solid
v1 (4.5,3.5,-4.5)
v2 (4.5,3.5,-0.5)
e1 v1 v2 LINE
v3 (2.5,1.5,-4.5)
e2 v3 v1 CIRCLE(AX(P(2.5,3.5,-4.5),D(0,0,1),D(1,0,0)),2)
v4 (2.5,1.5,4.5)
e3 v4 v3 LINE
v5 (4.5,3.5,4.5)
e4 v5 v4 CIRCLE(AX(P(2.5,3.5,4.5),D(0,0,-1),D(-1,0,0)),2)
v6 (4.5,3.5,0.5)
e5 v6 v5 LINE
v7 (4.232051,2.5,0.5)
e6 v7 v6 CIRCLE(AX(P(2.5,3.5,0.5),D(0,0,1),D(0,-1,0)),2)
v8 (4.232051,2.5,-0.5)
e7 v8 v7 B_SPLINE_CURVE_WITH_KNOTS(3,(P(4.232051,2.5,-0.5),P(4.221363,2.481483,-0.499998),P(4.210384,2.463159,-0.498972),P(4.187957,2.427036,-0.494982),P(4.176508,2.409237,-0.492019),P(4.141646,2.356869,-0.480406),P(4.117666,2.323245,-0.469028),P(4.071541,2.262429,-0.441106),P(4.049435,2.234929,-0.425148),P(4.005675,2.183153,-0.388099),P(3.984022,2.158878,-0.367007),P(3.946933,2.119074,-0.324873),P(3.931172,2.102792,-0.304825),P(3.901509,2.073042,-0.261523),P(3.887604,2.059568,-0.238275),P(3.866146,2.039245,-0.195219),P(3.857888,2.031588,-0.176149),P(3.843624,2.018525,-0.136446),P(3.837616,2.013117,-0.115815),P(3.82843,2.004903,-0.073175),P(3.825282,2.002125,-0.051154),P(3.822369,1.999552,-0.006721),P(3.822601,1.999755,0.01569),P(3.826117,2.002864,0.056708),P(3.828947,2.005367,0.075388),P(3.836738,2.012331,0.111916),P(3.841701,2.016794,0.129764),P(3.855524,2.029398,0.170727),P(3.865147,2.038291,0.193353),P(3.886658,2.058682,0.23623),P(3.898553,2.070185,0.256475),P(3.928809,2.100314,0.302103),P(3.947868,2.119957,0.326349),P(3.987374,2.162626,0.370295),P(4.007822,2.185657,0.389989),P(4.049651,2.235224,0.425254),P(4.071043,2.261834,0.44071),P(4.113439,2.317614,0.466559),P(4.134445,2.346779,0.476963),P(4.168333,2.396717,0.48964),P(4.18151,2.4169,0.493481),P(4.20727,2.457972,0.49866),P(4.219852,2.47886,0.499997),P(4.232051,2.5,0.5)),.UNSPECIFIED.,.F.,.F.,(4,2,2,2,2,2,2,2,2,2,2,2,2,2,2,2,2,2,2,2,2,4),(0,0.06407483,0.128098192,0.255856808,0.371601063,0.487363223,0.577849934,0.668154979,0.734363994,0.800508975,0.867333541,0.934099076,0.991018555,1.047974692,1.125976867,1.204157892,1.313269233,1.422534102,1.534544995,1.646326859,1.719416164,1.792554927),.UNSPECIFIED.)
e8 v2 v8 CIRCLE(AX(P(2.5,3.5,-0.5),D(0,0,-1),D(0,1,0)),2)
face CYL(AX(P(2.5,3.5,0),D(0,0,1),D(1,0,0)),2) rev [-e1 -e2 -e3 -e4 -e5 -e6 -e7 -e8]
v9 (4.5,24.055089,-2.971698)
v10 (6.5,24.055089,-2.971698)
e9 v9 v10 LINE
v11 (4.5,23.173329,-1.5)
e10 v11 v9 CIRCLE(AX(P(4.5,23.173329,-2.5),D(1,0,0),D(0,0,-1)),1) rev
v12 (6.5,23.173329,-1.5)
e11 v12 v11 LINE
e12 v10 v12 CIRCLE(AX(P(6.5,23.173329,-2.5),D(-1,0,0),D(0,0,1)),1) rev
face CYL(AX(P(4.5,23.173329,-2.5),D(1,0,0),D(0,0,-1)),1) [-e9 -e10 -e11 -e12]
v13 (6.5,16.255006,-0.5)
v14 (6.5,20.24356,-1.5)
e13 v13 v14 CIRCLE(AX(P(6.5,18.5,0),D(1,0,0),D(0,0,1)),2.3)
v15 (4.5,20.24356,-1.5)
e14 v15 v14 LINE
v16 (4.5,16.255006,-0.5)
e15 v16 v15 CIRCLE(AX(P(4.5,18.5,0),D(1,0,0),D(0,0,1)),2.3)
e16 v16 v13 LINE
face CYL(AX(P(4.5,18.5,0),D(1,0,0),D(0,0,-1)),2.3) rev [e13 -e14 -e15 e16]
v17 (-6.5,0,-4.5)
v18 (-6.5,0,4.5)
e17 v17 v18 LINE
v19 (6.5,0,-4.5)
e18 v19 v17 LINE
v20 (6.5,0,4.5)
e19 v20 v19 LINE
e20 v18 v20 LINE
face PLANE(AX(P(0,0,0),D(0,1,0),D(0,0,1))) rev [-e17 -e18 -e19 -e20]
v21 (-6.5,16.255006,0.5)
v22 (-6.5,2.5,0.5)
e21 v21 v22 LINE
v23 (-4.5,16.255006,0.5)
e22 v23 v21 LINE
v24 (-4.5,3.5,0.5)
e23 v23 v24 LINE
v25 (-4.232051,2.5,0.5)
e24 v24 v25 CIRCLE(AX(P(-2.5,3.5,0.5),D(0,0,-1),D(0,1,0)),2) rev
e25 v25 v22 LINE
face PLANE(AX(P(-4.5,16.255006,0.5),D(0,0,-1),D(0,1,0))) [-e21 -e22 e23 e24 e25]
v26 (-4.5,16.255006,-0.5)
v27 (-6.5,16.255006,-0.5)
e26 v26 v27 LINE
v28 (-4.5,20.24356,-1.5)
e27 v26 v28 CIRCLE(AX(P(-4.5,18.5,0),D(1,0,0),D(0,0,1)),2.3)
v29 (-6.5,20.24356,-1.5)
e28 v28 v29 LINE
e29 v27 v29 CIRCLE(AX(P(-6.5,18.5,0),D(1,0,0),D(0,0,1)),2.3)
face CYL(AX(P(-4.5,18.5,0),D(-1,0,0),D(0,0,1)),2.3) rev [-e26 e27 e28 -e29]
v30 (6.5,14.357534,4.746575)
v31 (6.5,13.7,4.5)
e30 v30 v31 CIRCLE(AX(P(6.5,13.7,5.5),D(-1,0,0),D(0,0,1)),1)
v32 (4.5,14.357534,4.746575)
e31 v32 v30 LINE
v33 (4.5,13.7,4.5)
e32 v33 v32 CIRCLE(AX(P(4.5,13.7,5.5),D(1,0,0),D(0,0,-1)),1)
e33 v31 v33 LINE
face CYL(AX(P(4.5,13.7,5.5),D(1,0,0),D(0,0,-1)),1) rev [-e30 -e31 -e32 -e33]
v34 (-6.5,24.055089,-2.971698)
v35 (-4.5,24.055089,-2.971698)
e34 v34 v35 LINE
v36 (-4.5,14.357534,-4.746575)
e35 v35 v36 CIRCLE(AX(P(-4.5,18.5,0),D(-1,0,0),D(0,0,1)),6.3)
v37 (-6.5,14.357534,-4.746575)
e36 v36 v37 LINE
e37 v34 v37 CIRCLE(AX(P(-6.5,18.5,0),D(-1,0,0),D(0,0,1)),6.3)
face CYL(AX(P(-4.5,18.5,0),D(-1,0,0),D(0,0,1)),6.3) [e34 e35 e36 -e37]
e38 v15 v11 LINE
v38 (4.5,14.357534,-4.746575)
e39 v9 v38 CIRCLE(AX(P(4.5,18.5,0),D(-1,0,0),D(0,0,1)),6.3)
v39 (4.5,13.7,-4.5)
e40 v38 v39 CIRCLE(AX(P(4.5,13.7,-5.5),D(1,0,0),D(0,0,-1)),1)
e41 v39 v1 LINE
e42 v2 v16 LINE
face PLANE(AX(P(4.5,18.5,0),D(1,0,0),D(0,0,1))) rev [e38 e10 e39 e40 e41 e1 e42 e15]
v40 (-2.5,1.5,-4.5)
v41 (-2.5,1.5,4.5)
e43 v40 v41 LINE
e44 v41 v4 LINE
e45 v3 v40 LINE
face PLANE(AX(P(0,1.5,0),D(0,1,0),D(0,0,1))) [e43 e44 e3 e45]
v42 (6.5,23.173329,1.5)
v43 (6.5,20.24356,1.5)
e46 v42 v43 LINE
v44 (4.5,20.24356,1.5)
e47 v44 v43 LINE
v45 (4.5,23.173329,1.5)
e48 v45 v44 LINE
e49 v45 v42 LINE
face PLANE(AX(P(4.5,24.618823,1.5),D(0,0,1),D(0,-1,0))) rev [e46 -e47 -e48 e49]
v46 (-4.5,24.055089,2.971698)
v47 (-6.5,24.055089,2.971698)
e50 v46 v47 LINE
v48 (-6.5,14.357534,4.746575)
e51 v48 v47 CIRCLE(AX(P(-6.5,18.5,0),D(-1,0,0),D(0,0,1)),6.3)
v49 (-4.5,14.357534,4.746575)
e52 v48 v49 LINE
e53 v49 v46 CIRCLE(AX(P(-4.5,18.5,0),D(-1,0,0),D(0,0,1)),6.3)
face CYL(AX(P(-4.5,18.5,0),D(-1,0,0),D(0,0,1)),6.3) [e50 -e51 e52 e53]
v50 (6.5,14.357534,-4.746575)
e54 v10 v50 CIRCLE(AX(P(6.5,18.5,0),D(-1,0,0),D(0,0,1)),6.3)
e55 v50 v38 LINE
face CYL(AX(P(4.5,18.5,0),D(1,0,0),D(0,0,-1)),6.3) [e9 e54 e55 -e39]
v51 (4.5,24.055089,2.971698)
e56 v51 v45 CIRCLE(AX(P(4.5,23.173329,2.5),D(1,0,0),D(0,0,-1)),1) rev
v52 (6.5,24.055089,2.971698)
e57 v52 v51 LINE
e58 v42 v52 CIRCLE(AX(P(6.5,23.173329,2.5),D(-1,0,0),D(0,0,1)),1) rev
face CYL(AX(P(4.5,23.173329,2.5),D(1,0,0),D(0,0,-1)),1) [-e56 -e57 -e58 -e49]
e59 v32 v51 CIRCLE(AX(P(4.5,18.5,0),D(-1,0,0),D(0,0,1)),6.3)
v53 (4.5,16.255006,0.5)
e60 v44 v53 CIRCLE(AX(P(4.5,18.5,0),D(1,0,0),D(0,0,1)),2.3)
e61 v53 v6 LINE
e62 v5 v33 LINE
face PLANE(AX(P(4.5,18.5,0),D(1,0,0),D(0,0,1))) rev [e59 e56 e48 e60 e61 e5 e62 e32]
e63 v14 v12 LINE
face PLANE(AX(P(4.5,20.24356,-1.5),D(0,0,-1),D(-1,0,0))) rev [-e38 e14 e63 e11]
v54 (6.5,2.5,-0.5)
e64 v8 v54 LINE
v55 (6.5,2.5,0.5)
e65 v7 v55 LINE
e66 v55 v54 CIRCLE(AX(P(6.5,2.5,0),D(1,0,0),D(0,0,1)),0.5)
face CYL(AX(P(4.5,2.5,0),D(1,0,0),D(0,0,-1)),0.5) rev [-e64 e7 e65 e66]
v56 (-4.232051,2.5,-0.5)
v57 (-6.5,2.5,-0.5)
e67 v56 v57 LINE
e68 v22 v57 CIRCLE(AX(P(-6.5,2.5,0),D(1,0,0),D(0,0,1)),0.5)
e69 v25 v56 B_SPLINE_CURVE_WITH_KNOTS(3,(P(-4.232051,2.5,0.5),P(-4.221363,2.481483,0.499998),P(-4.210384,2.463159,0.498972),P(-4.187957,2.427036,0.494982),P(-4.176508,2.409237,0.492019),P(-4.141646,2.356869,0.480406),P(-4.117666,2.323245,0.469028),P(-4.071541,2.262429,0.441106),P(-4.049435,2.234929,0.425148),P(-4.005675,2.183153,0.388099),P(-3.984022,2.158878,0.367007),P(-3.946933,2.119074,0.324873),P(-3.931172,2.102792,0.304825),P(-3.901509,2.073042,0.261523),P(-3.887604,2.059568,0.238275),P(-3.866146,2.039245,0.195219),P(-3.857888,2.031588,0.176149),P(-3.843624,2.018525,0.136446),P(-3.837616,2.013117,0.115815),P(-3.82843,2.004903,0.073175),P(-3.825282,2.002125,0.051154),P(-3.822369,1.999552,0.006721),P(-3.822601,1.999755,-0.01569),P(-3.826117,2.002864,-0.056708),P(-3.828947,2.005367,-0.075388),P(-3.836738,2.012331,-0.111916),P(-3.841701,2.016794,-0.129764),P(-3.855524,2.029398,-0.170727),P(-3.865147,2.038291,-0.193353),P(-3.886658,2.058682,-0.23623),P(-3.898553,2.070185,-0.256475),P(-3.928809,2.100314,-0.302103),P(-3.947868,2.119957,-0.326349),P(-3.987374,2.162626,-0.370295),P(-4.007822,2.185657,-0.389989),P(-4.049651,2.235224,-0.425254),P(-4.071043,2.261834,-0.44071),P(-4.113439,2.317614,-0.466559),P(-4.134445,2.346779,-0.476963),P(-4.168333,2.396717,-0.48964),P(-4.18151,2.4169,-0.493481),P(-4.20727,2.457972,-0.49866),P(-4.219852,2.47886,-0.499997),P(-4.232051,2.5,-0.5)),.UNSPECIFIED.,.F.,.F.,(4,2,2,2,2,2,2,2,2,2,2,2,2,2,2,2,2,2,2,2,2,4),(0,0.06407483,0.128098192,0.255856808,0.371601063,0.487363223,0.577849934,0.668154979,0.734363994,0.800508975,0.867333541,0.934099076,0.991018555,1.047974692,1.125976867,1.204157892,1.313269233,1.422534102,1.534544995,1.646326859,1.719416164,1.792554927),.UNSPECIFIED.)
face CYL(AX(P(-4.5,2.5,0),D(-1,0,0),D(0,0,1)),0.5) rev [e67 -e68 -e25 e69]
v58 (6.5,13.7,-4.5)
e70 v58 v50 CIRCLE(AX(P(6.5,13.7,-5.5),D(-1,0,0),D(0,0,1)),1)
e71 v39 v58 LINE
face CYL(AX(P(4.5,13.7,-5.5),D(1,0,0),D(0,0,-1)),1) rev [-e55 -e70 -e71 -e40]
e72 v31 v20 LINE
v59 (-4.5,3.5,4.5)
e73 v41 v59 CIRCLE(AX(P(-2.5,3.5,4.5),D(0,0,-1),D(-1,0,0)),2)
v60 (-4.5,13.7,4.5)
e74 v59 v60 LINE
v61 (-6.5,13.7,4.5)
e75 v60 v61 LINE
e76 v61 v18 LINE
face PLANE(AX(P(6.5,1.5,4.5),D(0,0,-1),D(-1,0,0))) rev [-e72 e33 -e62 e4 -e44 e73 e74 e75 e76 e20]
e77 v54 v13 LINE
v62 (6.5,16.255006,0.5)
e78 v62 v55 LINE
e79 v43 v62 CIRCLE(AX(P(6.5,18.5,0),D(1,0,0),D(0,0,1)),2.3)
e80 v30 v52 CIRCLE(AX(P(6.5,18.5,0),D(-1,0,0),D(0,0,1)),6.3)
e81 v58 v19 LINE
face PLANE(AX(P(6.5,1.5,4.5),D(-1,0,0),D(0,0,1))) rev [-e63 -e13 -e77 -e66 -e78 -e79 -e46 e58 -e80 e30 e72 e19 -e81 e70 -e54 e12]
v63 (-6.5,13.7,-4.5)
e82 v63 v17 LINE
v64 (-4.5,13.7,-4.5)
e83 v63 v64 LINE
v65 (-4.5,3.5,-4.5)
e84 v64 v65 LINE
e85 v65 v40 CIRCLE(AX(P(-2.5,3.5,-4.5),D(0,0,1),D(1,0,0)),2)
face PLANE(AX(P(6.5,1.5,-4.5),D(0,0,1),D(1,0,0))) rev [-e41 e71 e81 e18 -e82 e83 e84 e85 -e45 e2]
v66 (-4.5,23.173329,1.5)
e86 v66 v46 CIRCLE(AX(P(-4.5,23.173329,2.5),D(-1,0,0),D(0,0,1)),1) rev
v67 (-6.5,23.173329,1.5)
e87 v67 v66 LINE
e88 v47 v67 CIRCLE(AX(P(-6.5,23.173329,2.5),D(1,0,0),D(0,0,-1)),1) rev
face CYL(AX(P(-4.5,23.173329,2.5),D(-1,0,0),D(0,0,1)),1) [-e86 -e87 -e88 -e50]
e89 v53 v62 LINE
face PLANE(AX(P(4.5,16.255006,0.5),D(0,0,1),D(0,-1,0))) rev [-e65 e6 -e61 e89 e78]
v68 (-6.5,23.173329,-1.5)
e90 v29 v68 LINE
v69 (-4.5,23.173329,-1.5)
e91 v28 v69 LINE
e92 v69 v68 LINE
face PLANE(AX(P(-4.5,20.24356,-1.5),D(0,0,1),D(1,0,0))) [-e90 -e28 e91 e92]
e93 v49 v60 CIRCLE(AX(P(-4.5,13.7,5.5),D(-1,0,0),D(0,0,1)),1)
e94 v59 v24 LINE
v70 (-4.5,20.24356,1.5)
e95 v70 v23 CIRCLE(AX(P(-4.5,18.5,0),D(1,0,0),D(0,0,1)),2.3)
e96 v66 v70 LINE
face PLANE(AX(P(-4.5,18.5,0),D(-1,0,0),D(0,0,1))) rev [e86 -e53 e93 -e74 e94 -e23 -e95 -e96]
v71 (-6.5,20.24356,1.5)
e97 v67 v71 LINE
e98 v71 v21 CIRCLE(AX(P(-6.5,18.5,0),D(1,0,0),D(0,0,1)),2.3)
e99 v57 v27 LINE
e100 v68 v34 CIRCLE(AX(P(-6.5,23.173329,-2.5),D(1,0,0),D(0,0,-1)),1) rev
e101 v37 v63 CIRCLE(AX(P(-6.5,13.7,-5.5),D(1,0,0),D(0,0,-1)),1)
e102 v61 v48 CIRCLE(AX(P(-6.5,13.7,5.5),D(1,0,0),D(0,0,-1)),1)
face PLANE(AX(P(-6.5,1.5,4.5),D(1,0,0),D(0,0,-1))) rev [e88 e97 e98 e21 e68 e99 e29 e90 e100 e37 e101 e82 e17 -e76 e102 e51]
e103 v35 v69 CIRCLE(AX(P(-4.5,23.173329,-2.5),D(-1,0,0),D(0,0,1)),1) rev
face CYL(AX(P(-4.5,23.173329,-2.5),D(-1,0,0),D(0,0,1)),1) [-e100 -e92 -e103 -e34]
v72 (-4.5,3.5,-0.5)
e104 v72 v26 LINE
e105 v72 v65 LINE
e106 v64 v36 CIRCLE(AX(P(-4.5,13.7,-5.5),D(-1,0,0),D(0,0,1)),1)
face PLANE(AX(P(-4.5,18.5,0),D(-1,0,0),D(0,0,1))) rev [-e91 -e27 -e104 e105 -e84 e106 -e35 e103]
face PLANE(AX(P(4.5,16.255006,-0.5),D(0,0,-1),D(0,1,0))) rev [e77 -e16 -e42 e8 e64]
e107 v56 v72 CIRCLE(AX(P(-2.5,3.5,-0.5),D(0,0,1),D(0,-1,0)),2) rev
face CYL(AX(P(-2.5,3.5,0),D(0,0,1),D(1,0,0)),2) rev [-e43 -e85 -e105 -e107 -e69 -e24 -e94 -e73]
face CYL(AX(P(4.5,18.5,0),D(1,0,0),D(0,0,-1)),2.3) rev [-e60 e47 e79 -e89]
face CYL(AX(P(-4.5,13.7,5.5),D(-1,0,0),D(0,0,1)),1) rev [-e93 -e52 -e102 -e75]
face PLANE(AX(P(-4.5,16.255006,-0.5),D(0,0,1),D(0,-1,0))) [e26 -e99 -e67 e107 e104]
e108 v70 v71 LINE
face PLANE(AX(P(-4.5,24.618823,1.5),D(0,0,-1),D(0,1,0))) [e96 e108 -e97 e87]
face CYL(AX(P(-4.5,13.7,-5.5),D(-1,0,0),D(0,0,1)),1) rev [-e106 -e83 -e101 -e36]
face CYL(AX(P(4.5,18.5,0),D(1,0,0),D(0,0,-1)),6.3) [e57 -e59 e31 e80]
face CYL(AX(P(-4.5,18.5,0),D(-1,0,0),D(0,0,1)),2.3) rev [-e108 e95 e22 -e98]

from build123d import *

# Parameters (mm, degrees)
SKETCH1_W            = 13
SKETCH1_H            = 9
BOSS_EXTRUDE1_DEPTH  = 1.5
BOSS_EXTRUDE2_DEPTH  = 2
FILLET1_R            = 1
FILLET1_OF_MIRROR1_R = 1
FILLET2_START        = -4.5
FILLET2_DEPTH        = 4
FILLET2_START_2      = 0.5
FILLET2_2_DEPTH      = 4
FILLET2_3_DEPTH      = 1.695635927
FILLET2_START_3      = 2.821367992
FILLET2_4_DEPTH      = 1.678632008
FILLET2_START_4      = -0.5
FILLET2_5_DEPTH      = 1
FILLET2_6_DEPTH      = 1


with BuildPart() as part:
    # Sketch1 → Boss-Extrude1 (new body)
    with BuildSketch(Plane(origin=(0, 0, 0), x_dir=(1, 0, 0), z_dir=(0, 1, 0))):
        Rectangle(SKETCH1_W, SKETCH1_H)
    extrude(amount=BOSS_EXTRUDE1_DEPTH)

    # Sketch2 → Boss-Extrude2 (add)
    with BuildSketch(Plane.ZY.offset(6.5)):
        with BuildLine():
            Line((-4.5, 1.5), (4.5, 1.5))
            Line((4.5, 1.5), (4.5, 14.090918463))
            ThreePointArc((4.5, 14.090918463), (6.058811408, 20.2265006), (1.5, 24.618823416))
            Line((1.5, 24.618823416), (1.5, 20.243559577))
            ThreePointArc((1.5, 20.243559577), (2.230950643, 17.940661794), (0.5, 16.255005568))
            Line((0.5, 16.255005568), (0.5, 2.5))
            ThreePointArc((0.5, 2.5), (0, 2), (-0.5, 2.5))
            Line((-0.5, 2.5), (-0.5, 16.255005568))
            ThreePointArc((-0.5, 16.255005568), (-2.230950643, 17.940661794), (-1.5, 20.243559577))
            Line((-1.5, 20.243559577), (-1.5, 24.618823416))
            ThreePointArc((-1.5, 24.618823416), (-6.058811408, 20.2265006), (-4.5, 14.090918463))
            Line((-4.5, 14.090918463), (-4.5, 1.5))
        make_face()
    boss_extrude2 = extrude(amount=-BOSS_EXTRUDE2_DEPTH)

    # Fillet1
    fillet1_edges = [part.edges().sort_by_distance(p)[0] for p in [
        (-5.5, 14.090918463, -4.5),
        (-5.5, 24.618823416, -1.5),
        (-5.5, 24.618823416, 1.5),
        (-5.5, 14.090918463, 4.5),
    ]]
    fillet(fillet1_edges, radius=FILLET1_R)

    # Mirror1: Boss-Extrude2 across plane
    add(boss_extrude2.mirror(Plane(origin=(0, 0, 0), x_dir=(0, 0, 1), z_dir=(1, 0, 0))))

    # Fillet1 of Mirror1
    fillet1_of_mirror1_edges = [part.edges().sort_by_distance(p)[0] for p in [
        (5.5, 14.090918463, -4.5),
        (5.5, 24.618823416, -1.5),
        (5.5, 24.618823416, 1.5),
        (5.5, 14.090918463, 4.5),
    ]]
    fillet(fillet1_of_mirror1_edges, radius=FILLET1_OF_MIRROR1_R)

    # Fillet2: read off the stored shape, not the designer's step
    # Fillet2 outline → Fillet2 (add)
    with BuildSketch(Plane.XY.offset(FILLET2_START)):
        with BuildLine():
            ThreePointArc((4.5, 3.5), (3.914213562, 2.085786438), (2.5, 1.5))
            Line((2.5, 1.5), (4.5, 1.5))
            Line((4.5, 1.5), (4.5, 3.5))
        make_face()
        with BuildLine():
            ThreePointArc((-2.5, 1.5), (-3.914213562, 2.085786438), (-4.5, 3.5))
            Line((-4.5, 3.5), (-4.5, 1.5))
            Line((-4.5, 1.5), (-2.5, 1.5))
        make_face()
    extrude(amount=FILLET2_DEPTH)

    # Fillet2 2 outline → Fillet2 2 (add)
    with BuildSketch(Plane.XY.offset(FILLET2_START_2)):
        with BuildLine():
            ThreePointArc((4.5, 3.5), (3.914213562, 2.085786438), (2.5, 1.5))
            Line((2.5, 1.5), (4.5, 1.5))
            Line((4.5, 1.5), (4.5, 3.5))
        make_face()
        with BuildLine():
            ThreePointArc((-2.5, 1.5), (-3.914213562, 2.085786438), (-4.5, 3.5))
            Line((-4.5, 3.5), (-4.5, 1.5))
            Line((-4.5, 1.5), (-2.5, 1.5))
        make_face()
    extrude(amount=FILLET2_2_DEPTH)

    # Fillet2 3 outline → Fillet2 3 (add)
    with BuildSketch(Plane.YZ.offset(FILLET2_START)):
        with BuildLine():
            Line((1.5, -0.5), (2.5, -0.5))
            ThreePointArc((2.5, -0.5), (2, 0), (2.5, 0.5))
            Line((2.5, 0.5), (1.5, 0.5))
            Line((1.5, 0.5), (1.5, -0.5))
        make_face()
    extrude(amount=FILLET2_3_DEPTH)

    # Fillet2 4 outline → Fillet2 4 (add)
    with BuildSketch(Plane.YZ.offset(FILLET2_START_3)):
        with BuildLine():
            Line((1.5, -0.5), (2.5, -0.5))
            ThreePointArc((2.5, -0.5), (2, 0), (2.5, 0.5))
            Line((2.5, 0.5), (1.5, 0.5))
            Line((1.5, 0.5), (1.5, -0.5))
        make_face()
    extrude(amount=FILLET2_4_DEPTH)

    # Fillet2 5 outline → Fillet2 5 (cut)
    with BuildSketch(Plane.XY.offset(FILLET2_START_4)):
        with BuildLine():
            Line((-4.5, 4), (-4.5, 3.5))
            ThreePointArc((-4.5, 3.5), (-4.018013199, 2.19783414), (-2.804364073, 1.523295037))
            Line((-2.804364073, 1.523295037), (-2.804364073, 4))
            Line((-2.804364073, 4), (-4.5, 4))
        make_face()
        with BuildLine():
            Line((4.5, 4), (2.821367992, 4))
            Line((2.821367992, 4), (2.821367992, 1.525988193))
            ThreePointArc((2.821367992, 1.525988193), (4.02360362, 2.204379683), (4.5, 3.5))
            Line((4.5, 3.5), (4.5, 4))
        make_face()
    extrude(amount=FILLET2_5_DEPTH, mode=Mode.SUBTRACT)

    # Fillet2 6 outline → Fillet2 6 (add)
    with BuildSketch(Plane.XY.offset(FILLET2_START_4)):
        with BuildLine():
            ThreePointArc((-2.5, 1.5), (-2.652627117, 1.505832263), (-2.804364073, 1.523295037))
            Line((-2.804364073, 1.523295037), (-2.804364073, 1.5))
            Line((-2.804364073, 1.5), (-2.5, 1.5))
        make_face()
        with BuildLine():
            ThreePointArc((2.821367992, 1.525988193), (2.661208539, 1.506507636), (2.5, 1.5))
            Line((2.5, 1.5), (2.821367992, 1.499999997))
            Line((2.821367992, 1.499999997), (2.821367992, 1.525988193))
        make_face()
    extrude(amount=FILLET2_6_DEPTH)


solid = part.part
